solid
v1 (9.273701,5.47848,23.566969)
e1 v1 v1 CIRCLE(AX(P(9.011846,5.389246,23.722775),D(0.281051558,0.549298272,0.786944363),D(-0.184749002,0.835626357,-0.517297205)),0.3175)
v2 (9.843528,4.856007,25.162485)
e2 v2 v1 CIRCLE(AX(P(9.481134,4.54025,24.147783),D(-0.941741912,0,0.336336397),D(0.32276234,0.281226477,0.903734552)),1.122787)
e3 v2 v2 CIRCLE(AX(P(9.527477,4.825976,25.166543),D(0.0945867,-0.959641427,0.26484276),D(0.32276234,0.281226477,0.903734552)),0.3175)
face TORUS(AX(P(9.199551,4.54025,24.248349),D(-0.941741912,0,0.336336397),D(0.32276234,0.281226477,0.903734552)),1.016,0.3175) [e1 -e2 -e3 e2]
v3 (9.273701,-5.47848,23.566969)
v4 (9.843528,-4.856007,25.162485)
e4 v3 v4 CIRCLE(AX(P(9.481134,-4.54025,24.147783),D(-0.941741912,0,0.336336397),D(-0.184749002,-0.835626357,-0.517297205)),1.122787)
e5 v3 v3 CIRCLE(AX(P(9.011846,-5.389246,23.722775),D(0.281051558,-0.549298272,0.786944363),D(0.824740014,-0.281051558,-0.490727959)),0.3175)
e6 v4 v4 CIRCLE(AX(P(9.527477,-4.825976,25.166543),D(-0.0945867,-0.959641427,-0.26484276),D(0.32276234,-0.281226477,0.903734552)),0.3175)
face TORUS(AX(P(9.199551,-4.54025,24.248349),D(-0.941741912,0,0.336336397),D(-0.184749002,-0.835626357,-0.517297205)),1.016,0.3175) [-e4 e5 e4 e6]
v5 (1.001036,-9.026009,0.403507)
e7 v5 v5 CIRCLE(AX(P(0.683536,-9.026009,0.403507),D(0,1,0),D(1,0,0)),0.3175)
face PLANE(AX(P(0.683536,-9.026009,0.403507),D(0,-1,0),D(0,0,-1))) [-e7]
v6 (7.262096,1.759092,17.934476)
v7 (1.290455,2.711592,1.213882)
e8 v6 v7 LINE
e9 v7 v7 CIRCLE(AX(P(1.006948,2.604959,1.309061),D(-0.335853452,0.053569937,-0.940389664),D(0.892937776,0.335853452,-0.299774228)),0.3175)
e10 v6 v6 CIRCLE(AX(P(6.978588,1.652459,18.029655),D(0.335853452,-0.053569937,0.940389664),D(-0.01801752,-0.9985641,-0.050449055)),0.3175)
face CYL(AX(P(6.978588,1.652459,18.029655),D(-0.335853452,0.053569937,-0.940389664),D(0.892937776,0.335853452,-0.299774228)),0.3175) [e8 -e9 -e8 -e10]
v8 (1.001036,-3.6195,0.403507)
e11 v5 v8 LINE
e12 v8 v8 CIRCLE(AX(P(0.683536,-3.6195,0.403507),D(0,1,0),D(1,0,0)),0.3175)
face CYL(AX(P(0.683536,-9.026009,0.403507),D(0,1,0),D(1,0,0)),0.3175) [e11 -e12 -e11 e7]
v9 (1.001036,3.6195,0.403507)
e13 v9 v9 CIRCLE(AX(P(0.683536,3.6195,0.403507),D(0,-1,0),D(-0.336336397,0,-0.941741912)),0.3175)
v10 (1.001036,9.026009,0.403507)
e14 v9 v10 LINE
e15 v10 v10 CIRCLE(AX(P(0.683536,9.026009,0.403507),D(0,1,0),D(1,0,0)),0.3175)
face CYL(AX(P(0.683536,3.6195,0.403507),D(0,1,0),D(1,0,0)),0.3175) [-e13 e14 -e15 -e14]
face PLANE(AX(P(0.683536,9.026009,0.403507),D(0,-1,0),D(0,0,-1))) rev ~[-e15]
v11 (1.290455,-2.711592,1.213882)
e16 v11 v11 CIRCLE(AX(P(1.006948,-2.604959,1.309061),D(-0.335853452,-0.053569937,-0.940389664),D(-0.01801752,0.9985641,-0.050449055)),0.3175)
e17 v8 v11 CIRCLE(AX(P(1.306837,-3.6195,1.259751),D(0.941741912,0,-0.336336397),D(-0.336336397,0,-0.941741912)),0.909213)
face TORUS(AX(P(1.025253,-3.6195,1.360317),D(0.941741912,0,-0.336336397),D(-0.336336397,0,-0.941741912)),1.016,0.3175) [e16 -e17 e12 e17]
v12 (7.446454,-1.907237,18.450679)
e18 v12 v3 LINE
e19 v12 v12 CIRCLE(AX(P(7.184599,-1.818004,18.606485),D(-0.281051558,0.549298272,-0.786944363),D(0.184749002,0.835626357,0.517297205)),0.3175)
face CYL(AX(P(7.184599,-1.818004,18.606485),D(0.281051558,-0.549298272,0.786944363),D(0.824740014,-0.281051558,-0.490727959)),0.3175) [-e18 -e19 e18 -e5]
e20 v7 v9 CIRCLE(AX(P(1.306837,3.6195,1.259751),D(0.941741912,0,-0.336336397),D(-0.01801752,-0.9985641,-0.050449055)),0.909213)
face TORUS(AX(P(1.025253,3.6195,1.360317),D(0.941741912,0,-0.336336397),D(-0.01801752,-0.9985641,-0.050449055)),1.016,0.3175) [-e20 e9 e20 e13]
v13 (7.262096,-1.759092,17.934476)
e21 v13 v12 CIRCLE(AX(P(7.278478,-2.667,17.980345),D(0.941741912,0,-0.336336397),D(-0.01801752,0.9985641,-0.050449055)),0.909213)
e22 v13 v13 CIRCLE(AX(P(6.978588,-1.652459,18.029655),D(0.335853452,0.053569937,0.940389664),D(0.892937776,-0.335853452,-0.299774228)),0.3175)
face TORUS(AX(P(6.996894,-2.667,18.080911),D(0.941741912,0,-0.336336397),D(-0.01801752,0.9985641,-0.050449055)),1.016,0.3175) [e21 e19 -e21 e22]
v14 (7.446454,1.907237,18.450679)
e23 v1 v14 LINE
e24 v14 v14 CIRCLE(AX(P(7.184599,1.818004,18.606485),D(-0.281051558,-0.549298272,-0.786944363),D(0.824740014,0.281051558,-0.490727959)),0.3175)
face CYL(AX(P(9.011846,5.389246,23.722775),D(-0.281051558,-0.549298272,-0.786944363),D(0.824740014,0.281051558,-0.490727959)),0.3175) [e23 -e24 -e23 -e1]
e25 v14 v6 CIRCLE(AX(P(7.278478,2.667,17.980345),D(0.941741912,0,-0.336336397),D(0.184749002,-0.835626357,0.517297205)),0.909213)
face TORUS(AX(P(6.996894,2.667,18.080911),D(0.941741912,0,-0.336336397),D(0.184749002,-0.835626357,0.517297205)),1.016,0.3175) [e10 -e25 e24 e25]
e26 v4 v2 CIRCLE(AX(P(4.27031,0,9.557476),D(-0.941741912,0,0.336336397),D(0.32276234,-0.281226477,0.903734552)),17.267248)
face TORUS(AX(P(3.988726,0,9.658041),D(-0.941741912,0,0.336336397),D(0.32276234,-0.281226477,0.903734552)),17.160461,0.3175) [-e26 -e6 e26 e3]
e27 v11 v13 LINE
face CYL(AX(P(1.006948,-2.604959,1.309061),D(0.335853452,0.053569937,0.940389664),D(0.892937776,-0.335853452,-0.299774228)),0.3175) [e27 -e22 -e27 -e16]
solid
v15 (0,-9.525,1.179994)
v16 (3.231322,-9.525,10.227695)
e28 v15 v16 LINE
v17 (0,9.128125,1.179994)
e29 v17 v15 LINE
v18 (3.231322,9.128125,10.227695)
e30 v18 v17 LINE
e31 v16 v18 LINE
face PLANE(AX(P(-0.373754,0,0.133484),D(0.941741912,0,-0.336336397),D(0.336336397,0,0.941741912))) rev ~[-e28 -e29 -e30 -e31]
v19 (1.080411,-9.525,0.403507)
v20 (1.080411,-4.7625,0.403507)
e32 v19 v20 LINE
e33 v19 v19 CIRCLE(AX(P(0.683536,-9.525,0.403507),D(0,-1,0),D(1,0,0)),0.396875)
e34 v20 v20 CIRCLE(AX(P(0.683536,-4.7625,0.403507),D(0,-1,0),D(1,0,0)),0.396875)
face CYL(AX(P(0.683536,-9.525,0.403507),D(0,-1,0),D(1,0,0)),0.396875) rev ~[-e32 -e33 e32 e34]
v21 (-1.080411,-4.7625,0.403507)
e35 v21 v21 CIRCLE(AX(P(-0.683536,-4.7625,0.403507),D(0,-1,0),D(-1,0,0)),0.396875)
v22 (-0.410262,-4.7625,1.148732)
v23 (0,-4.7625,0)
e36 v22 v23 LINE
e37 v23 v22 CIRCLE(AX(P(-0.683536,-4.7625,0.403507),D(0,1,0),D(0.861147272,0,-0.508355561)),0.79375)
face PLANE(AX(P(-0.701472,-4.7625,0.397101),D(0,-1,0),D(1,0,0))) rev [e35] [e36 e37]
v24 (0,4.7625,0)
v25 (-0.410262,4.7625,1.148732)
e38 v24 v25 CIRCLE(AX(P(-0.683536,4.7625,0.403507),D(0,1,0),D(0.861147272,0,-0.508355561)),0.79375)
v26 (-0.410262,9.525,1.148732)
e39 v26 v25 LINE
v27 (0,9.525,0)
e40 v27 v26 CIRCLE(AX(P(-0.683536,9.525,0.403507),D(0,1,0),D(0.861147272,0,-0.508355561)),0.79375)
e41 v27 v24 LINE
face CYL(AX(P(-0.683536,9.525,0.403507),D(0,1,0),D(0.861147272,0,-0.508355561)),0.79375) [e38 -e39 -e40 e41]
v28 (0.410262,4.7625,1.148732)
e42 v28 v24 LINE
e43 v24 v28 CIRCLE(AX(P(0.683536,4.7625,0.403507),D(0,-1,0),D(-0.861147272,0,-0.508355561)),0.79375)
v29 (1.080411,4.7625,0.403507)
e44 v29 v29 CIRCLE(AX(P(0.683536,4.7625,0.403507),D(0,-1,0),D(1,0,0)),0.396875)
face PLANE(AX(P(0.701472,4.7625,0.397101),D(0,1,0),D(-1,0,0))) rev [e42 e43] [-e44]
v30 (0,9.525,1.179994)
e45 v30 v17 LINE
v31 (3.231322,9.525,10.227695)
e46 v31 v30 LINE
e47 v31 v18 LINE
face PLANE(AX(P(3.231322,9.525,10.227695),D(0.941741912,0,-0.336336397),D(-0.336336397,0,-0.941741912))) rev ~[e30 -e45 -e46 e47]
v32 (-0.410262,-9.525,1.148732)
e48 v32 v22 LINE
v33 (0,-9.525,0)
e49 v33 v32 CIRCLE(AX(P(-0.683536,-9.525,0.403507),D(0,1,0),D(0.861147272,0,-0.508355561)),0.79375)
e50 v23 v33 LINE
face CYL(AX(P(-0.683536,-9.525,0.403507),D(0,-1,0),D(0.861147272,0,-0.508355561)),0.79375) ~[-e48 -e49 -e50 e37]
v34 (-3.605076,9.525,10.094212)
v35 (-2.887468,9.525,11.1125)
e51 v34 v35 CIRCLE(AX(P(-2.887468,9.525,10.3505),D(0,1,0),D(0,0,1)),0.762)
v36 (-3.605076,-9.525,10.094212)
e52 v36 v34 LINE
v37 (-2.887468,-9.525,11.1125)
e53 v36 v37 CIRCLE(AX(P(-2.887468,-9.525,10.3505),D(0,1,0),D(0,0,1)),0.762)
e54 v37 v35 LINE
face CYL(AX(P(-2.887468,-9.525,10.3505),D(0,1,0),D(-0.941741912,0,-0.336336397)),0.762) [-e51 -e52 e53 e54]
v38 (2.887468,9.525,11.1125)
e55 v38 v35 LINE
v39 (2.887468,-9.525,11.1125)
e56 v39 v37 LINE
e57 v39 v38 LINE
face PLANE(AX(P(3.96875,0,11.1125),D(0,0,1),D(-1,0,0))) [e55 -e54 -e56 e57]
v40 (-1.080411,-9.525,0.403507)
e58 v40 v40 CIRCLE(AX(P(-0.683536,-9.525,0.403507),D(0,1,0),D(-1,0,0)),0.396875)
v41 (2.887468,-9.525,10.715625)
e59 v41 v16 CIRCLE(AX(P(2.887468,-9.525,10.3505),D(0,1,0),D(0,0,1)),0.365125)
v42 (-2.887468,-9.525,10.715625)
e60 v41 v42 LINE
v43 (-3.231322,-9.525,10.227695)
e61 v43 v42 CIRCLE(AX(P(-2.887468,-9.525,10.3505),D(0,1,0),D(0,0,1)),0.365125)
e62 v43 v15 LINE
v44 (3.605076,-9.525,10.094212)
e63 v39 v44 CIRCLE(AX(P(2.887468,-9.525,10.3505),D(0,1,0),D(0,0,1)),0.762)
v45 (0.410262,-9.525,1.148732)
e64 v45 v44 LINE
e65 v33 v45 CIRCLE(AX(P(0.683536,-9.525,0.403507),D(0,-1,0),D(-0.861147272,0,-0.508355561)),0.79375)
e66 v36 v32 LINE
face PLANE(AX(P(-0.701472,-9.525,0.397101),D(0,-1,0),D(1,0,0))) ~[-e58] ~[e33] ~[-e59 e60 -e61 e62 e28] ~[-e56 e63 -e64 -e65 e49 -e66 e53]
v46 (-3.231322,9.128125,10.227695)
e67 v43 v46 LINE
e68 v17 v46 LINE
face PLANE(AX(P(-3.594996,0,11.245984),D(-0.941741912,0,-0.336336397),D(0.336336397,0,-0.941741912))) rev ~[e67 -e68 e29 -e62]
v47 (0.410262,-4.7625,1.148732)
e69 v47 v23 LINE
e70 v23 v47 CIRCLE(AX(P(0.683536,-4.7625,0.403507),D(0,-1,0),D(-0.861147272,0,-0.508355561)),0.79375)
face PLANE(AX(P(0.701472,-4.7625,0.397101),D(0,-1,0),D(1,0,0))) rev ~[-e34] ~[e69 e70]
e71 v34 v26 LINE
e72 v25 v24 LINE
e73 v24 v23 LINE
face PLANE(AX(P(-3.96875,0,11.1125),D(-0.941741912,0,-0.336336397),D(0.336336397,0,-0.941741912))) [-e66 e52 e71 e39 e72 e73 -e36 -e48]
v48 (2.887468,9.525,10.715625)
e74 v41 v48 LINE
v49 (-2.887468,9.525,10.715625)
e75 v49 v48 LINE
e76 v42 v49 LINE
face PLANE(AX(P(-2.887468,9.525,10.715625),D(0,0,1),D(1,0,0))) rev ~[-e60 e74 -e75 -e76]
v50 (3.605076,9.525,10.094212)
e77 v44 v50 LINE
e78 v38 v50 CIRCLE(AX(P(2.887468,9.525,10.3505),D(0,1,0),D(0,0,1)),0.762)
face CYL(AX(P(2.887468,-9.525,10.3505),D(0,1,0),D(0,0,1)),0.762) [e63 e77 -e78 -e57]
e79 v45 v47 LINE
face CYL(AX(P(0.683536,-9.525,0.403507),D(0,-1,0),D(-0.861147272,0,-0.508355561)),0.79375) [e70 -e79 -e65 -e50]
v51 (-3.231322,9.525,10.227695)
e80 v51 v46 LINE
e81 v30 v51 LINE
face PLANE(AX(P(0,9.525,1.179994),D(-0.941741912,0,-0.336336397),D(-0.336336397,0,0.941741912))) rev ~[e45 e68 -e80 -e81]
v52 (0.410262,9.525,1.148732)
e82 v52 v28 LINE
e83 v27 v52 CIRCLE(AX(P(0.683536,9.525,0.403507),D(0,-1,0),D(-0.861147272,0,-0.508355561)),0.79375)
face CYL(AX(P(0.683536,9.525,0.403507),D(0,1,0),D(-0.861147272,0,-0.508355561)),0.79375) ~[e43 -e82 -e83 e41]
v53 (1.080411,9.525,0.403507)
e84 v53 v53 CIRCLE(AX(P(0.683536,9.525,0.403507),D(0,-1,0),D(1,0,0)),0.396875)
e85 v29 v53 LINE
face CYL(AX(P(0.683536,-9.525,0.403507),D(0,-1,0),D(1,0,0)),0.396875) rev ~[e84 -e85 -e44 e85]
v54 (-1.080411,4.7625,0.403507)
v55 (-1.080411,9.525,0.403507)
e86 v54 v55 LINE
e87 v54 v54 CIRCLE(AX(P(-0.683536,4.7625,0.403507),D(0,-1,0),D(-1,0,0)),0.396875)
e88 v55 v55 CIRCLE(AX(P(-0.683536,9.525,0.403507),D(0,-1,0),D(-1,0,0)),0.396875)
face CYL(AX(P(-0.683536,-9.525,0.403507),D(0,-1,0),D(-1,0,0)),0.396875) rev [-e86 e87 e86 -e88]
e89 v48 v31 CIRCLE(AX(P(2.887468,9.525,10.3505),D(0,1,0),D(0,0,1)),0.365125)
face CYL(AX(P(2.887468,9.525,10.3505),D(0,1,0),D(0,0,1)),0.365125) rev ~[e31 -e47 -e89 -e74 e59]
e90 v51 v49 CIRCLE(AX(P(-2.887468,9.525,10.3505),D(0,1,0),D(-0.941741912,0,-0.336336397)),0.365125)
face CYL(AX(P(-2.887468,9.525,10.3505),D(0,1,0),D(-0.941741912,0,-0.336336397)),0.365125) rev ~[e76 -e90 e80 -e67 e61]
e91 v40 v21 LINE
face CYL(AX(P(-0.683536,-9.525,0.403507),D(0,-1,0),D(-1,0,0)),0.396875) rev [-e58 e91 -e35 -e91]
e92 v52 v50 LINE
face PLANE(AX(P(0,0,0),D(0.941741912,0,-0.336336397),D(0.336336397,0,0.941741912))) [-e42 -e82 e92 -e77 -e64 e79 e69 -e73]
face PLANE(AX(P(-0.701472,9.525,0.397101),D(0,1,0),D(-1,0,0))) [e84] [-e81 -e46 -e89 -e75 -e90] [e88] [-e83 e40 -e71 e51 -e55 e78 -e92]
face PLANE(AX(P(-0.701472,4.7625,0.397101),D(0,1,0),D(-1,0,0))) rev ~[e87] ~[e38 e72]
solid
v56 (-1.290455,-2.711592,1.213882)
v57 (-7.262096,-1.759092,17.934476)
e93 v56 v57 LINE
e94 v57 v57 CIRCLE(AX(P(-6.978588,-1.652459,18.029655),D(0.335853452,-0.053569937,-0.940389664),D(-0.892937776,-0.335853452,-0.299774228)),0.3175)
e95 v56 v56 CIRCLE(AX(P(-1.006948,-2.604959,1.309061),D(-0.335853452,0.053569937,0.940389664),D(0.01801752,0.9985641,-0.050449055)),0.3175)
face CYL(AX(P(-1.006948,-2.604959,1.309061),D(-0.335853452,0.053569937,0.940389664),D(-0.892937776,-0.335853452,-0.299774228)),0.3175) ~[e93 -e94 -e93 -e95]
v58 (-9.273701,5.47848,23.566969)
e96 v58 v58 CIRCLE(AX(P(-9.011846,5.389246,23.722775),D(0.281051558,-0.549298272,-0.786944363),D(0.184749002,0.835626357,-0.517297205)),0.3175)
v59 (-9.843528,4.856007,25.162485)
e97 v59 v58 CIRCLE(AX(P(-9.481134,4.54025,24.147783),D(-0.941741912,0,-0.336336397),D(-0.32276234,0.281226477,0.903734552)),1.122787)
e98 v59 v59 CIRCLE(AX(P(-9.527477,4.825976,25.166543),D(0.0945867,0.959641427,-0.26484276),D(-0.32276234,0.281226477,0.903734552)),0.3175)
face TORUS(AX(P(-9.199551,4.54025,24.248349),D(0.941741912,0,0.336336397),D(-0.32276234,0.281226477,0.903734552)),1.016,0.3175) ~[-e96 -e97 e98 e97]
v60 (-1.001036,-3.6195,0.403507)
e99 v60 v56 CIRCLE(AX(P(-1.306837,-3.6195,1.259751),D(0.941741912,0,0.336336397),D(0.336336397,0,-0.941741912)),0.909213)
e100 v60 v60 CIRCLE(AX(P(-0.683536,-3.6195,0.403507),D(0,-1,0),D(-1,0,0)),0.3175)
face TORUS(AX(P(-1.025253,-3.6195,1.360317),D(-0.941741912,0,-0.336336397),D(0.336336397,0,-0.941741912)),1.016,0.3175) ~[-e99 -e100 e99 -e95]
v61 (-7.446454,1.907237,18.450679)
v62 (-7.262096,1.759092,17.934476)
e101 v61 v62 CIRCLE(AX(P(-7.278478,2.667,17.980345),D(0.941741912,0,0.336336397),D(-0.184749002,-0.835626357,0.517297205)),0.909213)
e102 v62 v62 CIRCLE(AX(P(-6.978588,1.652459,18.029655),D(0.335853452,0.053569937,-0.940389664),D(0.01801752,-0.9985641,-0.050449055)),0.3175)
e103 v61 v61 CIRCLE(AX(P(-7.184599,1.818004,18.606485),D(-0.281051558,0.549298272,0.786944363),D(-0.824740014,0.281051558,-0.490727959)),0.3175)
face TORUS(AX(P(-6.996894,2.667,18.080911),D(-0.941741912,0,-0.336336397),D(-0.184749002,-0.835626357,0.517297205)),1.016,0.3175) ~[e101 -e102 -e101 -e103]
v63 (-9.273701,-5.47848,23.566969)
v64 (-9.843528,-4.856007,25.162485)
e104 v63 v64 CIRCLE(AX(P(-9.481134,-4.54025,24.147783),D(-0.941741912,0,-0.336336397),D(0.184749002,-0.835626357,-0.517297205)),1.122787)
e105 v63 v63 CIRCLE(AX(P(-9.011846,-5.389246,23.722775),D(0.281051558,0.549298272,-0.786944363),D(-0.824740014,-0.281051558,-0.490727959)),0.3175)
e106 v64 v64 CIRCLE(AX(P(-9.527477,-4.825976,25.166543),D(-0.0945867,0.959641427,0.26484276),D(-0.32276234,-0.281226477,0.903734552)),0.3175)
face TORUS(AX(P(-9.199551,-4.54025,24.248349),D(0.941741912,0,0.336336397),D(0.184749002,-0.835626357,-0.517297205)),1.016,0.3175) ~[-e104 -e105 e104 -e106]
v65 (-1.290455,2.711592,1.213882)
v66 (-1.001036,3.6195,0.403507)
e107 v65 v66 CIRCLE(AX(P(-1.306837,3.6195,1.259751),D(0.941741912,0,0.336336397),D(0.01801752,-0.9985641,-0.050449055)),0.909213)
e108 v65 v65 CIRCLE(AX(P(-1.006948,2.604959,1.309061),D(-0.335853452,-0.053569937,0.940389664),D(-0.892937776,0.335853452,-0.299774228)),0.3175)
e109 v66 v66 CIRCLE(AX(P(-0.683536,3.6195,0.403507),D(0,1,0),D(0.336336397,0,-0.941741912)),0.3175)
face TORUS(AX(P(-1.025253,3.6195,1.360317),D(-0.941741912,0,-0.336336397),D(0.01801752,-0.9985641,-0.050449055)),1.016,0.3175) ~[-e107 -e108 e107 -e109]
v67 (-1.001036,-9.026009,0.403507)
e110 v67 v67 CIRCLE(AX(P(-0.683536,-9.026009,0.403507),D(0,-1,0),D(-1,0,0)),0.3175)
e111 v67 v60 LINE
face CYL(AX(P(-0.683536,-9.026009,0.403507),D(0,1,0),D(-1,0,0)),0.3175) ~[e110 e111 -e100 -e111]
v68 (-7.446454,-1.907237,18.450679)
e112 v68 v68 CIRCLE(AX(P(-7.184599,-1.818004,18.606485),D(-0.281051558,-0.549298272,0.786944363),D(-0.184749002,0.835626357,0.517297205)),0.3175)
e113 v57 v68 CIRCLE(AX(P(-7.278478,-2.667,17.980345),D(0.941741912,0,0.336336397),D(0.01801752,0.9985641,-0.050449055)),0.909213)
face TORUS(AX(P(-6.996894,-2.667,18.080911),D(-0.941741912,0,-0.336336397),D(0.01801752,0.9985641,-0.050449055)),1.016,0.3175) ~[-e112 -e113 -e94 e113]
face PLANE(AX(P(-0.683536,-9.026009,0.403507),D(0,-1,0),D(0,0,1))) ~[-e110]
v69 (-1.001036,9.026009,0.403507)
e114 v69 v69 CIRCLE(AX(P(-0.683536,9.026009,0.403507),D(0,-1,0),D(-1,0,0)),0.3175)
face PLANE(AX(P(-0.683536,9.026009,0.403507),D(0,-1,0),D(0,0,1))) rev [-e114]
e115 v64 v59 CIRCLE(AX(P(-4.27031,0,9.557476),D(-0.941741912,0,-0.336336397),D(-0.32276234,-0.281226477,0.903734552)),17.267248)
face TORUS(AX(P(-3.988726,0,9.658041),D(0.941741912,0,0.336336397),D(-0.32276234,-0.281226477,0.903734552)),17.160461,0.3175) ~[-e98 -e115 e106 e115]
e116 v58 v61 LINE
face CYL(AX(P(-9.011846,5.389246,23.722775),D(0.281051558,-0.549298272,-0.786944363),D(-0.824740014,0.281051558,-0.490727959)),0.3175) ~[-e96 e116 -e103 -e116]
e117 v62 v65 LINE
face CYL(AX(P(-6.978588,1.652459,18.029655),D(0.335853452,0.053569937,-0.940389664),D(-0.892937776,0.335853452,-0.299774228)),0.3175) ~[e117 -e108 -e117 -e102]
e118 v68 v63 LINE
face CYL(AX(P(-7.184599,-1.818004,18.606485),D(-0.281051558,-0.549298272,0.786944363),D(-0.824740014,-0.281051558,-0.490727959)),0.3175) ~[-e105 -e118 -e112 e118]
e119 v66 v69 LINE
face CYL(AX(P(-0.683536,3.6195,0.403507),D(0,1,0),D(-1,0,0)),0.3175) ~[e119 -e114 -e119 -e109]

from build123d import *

# Parameters (mm, degrees)
F1_DEPTH         = 9.525
F2_R             = 0.762
F3_T             = -0.396875
F5_DEPTH         = 19.051
F7_DEPTH         = 4.7625
F7_COPIES2_COUNT = 2
F8_R             = 0.396875
F9_DEPTH         = 19.051
F14_R            = 0.3175


# Not quite as in the source:
# - a pattern or mirror of a feature is missing from the dataset's text; its kind, count and spacing are read off the source's solid


with BuildPart() as f1:
    # F0 (on Front) → F1 (new body, symmetric)
    with BuildSketch(Plane.XZ):
        Polygon((-3.96875, 11.1125), (0, 0), (3.96875, 11.1125), align=None)
    extrude(amount=F1_DEPTH, both=True)

    # F2
    f2_edges = [f1.edges().sort_by_distance(p)[0] for p in [
        (3.96875, 0, 11.1125),
        (-3.96875, 0, 11.1125),
    ]]
    fillet(f2_edges, radius=F2_R)

    # F3
    f3_openings = [f1.faces().sort_by_distance(p)[0] for p in [
        (0, -9.525, 7.365674),
    ]]
    offset(amount=F3_T, openings=f3_openings)

    # F4 (on face) → F5 (cut, through all)
    with BuildSketch(Plane(origin=(0, 9.525, 0), x_dir=(-1, 0, 0), z_dir=(0, 1, 0))):
        with BuildLine():
            ThreePointArc((3.2313217737, 10.227695173), (3.1859271147, 10.5608296855), (2.8874682582, 10.715625))
            Line((2.8874682582, 10.715625), (-2.8874682582, 10.715625))
            ThreePointArc((-2.8874682582, 10.715625), (-3.1859271147, 10.5608296855), (-3.2313217737, 10.227695173))
            Line((-3.2313217737, 10.227695173), (0, 1.1799942068))
            Line((0, 1.1799942068), (3.2313217737, 10.227695173))
        make_face()
    extrude(amount=-F5_DEPTH, mode=Mode.SUBTRACT)

    # F6 (on face) → F7 (join)
    with BuildSketch(Plane.XZ.offset(9.525)):
        with BuildLine():
            Line((0.4102615116, 1.1487322325), (0, 0))
            ThreePointArc((0, 0), (1.4310432892, 0.1365402115), (0.4102615116, 1.1487322325))
        make_face()
    f7 = extrude(amount=-F7_DEPTH)

    # F7_copies: F7 across plane
    add(f7.mirror(Plane(origin=(0, 0, 0), x_dir=(0, 0, -1), z_dir=(-1, 0, 0))))

    # F7_copies1: F7 across plane
    add(f7.mirror(Plane.ZX))

    # F7_copies2: F7 ×2 about axis
    f7_copies2_axis = Axis((0, 0, 0), (0, 0, 1))
    for i in range(1, F7_COPIES2_COUNT):
        add(f7.rotate(f7_copies2_axis, i * 360 / F7_COPIES2_COUNT))

    # F8 (on face) → F9 (cut, through all)
    with BuildSketch(Plane.XZ.offset(9.525)):
        with Locations((0.6835356469, 0.4035072266)):
            Circle(F8_R)
    f9 = extrude(amount=-F9_DEPTH, mode=Mode.SUBTRACT)

    # F9_copies: F9 across plane
    add(f9.mirror(Plane(origin=(0, 0, 0), x_dir=(0, 0, -1), z_dir=(-1, 0, 0))), mode=Mode.SUBTRACT)


with BuildPart() as f15:
    # F15: sweep along a path in F12
    with BuildLine(Plane(origin=(0.4784048911, 0, -0.1708588897), x_dir=(0, 1, 0), z_dir=(0.9417419116, 0, -0.336336397))) as f15_path:
        Line((-9.0260086581, 0.6098975836), (-3.6195, 0.6098975836))
        ThreePointArc((-3.6195, 0.6098975836), (-2.9205872332, 0.8884852537), (-2.6049588744, 1.5714705278))
        Line((-2.6049588744, 1.5714705278), (-1.6524588744, 19.326434617))
        ThreePointArc((-1.6524588744, 19.326434617), (-1.6861909522, 19.6459458327), (-1.8180036213, 19.9389487171))
        Line((-1.8180036213, 19.9389487171), (-5.3892463787, 25.3717431168))
        ThreePointArc((-5.3892463787, 25.3717431168), (-5.4939189383, 26.2802178837), (-4.825976101, 26.9048258509))
        ThreePointArc((-4.825976101, 26.9048258509), (0, 27.5973975836), (4.825976101, 26.9048258509))
        ThreePointArc((4.825976101, 26.9048258509), (5.4939189383, 26.2802178837), (5.3892463787, 25.3717431168))
        Line((5.3892463787, 25.3717431168), (1.8180036213, 19.9389487171))
        ThreePointArc((1.8180036213, 19.9389487171), (1.6861909522, 19.6459458327), (1.6524588744, 19.326434617))
        Line((1.6524588744, 19.326434617), (2.6049588744, 1.5714705278))
        ThreePointArc((2.6049588744, 1.5714705278), (2.9205872332, 0.8884852537), (3.6195, 0.6098975836))
        Line((3.6195, 0.6098975836), (9.0260086581, 0.6098975836))
    # F14 (on face) → F15 (sweep)
    with BuildSketch(Plane.XZ.offset(9.0260086581)):
        with Locations((0.6835356469, 0.4035072266)):
            Circle(F14_R)
    sweep(path=f15_path.line)


with BuildPart() as f16_1:
    # F16: instance of F15
    add(f15.part.mirror(Plane.YZ))


solid = Compound([f1.part, f15.part, f16_1.part])
